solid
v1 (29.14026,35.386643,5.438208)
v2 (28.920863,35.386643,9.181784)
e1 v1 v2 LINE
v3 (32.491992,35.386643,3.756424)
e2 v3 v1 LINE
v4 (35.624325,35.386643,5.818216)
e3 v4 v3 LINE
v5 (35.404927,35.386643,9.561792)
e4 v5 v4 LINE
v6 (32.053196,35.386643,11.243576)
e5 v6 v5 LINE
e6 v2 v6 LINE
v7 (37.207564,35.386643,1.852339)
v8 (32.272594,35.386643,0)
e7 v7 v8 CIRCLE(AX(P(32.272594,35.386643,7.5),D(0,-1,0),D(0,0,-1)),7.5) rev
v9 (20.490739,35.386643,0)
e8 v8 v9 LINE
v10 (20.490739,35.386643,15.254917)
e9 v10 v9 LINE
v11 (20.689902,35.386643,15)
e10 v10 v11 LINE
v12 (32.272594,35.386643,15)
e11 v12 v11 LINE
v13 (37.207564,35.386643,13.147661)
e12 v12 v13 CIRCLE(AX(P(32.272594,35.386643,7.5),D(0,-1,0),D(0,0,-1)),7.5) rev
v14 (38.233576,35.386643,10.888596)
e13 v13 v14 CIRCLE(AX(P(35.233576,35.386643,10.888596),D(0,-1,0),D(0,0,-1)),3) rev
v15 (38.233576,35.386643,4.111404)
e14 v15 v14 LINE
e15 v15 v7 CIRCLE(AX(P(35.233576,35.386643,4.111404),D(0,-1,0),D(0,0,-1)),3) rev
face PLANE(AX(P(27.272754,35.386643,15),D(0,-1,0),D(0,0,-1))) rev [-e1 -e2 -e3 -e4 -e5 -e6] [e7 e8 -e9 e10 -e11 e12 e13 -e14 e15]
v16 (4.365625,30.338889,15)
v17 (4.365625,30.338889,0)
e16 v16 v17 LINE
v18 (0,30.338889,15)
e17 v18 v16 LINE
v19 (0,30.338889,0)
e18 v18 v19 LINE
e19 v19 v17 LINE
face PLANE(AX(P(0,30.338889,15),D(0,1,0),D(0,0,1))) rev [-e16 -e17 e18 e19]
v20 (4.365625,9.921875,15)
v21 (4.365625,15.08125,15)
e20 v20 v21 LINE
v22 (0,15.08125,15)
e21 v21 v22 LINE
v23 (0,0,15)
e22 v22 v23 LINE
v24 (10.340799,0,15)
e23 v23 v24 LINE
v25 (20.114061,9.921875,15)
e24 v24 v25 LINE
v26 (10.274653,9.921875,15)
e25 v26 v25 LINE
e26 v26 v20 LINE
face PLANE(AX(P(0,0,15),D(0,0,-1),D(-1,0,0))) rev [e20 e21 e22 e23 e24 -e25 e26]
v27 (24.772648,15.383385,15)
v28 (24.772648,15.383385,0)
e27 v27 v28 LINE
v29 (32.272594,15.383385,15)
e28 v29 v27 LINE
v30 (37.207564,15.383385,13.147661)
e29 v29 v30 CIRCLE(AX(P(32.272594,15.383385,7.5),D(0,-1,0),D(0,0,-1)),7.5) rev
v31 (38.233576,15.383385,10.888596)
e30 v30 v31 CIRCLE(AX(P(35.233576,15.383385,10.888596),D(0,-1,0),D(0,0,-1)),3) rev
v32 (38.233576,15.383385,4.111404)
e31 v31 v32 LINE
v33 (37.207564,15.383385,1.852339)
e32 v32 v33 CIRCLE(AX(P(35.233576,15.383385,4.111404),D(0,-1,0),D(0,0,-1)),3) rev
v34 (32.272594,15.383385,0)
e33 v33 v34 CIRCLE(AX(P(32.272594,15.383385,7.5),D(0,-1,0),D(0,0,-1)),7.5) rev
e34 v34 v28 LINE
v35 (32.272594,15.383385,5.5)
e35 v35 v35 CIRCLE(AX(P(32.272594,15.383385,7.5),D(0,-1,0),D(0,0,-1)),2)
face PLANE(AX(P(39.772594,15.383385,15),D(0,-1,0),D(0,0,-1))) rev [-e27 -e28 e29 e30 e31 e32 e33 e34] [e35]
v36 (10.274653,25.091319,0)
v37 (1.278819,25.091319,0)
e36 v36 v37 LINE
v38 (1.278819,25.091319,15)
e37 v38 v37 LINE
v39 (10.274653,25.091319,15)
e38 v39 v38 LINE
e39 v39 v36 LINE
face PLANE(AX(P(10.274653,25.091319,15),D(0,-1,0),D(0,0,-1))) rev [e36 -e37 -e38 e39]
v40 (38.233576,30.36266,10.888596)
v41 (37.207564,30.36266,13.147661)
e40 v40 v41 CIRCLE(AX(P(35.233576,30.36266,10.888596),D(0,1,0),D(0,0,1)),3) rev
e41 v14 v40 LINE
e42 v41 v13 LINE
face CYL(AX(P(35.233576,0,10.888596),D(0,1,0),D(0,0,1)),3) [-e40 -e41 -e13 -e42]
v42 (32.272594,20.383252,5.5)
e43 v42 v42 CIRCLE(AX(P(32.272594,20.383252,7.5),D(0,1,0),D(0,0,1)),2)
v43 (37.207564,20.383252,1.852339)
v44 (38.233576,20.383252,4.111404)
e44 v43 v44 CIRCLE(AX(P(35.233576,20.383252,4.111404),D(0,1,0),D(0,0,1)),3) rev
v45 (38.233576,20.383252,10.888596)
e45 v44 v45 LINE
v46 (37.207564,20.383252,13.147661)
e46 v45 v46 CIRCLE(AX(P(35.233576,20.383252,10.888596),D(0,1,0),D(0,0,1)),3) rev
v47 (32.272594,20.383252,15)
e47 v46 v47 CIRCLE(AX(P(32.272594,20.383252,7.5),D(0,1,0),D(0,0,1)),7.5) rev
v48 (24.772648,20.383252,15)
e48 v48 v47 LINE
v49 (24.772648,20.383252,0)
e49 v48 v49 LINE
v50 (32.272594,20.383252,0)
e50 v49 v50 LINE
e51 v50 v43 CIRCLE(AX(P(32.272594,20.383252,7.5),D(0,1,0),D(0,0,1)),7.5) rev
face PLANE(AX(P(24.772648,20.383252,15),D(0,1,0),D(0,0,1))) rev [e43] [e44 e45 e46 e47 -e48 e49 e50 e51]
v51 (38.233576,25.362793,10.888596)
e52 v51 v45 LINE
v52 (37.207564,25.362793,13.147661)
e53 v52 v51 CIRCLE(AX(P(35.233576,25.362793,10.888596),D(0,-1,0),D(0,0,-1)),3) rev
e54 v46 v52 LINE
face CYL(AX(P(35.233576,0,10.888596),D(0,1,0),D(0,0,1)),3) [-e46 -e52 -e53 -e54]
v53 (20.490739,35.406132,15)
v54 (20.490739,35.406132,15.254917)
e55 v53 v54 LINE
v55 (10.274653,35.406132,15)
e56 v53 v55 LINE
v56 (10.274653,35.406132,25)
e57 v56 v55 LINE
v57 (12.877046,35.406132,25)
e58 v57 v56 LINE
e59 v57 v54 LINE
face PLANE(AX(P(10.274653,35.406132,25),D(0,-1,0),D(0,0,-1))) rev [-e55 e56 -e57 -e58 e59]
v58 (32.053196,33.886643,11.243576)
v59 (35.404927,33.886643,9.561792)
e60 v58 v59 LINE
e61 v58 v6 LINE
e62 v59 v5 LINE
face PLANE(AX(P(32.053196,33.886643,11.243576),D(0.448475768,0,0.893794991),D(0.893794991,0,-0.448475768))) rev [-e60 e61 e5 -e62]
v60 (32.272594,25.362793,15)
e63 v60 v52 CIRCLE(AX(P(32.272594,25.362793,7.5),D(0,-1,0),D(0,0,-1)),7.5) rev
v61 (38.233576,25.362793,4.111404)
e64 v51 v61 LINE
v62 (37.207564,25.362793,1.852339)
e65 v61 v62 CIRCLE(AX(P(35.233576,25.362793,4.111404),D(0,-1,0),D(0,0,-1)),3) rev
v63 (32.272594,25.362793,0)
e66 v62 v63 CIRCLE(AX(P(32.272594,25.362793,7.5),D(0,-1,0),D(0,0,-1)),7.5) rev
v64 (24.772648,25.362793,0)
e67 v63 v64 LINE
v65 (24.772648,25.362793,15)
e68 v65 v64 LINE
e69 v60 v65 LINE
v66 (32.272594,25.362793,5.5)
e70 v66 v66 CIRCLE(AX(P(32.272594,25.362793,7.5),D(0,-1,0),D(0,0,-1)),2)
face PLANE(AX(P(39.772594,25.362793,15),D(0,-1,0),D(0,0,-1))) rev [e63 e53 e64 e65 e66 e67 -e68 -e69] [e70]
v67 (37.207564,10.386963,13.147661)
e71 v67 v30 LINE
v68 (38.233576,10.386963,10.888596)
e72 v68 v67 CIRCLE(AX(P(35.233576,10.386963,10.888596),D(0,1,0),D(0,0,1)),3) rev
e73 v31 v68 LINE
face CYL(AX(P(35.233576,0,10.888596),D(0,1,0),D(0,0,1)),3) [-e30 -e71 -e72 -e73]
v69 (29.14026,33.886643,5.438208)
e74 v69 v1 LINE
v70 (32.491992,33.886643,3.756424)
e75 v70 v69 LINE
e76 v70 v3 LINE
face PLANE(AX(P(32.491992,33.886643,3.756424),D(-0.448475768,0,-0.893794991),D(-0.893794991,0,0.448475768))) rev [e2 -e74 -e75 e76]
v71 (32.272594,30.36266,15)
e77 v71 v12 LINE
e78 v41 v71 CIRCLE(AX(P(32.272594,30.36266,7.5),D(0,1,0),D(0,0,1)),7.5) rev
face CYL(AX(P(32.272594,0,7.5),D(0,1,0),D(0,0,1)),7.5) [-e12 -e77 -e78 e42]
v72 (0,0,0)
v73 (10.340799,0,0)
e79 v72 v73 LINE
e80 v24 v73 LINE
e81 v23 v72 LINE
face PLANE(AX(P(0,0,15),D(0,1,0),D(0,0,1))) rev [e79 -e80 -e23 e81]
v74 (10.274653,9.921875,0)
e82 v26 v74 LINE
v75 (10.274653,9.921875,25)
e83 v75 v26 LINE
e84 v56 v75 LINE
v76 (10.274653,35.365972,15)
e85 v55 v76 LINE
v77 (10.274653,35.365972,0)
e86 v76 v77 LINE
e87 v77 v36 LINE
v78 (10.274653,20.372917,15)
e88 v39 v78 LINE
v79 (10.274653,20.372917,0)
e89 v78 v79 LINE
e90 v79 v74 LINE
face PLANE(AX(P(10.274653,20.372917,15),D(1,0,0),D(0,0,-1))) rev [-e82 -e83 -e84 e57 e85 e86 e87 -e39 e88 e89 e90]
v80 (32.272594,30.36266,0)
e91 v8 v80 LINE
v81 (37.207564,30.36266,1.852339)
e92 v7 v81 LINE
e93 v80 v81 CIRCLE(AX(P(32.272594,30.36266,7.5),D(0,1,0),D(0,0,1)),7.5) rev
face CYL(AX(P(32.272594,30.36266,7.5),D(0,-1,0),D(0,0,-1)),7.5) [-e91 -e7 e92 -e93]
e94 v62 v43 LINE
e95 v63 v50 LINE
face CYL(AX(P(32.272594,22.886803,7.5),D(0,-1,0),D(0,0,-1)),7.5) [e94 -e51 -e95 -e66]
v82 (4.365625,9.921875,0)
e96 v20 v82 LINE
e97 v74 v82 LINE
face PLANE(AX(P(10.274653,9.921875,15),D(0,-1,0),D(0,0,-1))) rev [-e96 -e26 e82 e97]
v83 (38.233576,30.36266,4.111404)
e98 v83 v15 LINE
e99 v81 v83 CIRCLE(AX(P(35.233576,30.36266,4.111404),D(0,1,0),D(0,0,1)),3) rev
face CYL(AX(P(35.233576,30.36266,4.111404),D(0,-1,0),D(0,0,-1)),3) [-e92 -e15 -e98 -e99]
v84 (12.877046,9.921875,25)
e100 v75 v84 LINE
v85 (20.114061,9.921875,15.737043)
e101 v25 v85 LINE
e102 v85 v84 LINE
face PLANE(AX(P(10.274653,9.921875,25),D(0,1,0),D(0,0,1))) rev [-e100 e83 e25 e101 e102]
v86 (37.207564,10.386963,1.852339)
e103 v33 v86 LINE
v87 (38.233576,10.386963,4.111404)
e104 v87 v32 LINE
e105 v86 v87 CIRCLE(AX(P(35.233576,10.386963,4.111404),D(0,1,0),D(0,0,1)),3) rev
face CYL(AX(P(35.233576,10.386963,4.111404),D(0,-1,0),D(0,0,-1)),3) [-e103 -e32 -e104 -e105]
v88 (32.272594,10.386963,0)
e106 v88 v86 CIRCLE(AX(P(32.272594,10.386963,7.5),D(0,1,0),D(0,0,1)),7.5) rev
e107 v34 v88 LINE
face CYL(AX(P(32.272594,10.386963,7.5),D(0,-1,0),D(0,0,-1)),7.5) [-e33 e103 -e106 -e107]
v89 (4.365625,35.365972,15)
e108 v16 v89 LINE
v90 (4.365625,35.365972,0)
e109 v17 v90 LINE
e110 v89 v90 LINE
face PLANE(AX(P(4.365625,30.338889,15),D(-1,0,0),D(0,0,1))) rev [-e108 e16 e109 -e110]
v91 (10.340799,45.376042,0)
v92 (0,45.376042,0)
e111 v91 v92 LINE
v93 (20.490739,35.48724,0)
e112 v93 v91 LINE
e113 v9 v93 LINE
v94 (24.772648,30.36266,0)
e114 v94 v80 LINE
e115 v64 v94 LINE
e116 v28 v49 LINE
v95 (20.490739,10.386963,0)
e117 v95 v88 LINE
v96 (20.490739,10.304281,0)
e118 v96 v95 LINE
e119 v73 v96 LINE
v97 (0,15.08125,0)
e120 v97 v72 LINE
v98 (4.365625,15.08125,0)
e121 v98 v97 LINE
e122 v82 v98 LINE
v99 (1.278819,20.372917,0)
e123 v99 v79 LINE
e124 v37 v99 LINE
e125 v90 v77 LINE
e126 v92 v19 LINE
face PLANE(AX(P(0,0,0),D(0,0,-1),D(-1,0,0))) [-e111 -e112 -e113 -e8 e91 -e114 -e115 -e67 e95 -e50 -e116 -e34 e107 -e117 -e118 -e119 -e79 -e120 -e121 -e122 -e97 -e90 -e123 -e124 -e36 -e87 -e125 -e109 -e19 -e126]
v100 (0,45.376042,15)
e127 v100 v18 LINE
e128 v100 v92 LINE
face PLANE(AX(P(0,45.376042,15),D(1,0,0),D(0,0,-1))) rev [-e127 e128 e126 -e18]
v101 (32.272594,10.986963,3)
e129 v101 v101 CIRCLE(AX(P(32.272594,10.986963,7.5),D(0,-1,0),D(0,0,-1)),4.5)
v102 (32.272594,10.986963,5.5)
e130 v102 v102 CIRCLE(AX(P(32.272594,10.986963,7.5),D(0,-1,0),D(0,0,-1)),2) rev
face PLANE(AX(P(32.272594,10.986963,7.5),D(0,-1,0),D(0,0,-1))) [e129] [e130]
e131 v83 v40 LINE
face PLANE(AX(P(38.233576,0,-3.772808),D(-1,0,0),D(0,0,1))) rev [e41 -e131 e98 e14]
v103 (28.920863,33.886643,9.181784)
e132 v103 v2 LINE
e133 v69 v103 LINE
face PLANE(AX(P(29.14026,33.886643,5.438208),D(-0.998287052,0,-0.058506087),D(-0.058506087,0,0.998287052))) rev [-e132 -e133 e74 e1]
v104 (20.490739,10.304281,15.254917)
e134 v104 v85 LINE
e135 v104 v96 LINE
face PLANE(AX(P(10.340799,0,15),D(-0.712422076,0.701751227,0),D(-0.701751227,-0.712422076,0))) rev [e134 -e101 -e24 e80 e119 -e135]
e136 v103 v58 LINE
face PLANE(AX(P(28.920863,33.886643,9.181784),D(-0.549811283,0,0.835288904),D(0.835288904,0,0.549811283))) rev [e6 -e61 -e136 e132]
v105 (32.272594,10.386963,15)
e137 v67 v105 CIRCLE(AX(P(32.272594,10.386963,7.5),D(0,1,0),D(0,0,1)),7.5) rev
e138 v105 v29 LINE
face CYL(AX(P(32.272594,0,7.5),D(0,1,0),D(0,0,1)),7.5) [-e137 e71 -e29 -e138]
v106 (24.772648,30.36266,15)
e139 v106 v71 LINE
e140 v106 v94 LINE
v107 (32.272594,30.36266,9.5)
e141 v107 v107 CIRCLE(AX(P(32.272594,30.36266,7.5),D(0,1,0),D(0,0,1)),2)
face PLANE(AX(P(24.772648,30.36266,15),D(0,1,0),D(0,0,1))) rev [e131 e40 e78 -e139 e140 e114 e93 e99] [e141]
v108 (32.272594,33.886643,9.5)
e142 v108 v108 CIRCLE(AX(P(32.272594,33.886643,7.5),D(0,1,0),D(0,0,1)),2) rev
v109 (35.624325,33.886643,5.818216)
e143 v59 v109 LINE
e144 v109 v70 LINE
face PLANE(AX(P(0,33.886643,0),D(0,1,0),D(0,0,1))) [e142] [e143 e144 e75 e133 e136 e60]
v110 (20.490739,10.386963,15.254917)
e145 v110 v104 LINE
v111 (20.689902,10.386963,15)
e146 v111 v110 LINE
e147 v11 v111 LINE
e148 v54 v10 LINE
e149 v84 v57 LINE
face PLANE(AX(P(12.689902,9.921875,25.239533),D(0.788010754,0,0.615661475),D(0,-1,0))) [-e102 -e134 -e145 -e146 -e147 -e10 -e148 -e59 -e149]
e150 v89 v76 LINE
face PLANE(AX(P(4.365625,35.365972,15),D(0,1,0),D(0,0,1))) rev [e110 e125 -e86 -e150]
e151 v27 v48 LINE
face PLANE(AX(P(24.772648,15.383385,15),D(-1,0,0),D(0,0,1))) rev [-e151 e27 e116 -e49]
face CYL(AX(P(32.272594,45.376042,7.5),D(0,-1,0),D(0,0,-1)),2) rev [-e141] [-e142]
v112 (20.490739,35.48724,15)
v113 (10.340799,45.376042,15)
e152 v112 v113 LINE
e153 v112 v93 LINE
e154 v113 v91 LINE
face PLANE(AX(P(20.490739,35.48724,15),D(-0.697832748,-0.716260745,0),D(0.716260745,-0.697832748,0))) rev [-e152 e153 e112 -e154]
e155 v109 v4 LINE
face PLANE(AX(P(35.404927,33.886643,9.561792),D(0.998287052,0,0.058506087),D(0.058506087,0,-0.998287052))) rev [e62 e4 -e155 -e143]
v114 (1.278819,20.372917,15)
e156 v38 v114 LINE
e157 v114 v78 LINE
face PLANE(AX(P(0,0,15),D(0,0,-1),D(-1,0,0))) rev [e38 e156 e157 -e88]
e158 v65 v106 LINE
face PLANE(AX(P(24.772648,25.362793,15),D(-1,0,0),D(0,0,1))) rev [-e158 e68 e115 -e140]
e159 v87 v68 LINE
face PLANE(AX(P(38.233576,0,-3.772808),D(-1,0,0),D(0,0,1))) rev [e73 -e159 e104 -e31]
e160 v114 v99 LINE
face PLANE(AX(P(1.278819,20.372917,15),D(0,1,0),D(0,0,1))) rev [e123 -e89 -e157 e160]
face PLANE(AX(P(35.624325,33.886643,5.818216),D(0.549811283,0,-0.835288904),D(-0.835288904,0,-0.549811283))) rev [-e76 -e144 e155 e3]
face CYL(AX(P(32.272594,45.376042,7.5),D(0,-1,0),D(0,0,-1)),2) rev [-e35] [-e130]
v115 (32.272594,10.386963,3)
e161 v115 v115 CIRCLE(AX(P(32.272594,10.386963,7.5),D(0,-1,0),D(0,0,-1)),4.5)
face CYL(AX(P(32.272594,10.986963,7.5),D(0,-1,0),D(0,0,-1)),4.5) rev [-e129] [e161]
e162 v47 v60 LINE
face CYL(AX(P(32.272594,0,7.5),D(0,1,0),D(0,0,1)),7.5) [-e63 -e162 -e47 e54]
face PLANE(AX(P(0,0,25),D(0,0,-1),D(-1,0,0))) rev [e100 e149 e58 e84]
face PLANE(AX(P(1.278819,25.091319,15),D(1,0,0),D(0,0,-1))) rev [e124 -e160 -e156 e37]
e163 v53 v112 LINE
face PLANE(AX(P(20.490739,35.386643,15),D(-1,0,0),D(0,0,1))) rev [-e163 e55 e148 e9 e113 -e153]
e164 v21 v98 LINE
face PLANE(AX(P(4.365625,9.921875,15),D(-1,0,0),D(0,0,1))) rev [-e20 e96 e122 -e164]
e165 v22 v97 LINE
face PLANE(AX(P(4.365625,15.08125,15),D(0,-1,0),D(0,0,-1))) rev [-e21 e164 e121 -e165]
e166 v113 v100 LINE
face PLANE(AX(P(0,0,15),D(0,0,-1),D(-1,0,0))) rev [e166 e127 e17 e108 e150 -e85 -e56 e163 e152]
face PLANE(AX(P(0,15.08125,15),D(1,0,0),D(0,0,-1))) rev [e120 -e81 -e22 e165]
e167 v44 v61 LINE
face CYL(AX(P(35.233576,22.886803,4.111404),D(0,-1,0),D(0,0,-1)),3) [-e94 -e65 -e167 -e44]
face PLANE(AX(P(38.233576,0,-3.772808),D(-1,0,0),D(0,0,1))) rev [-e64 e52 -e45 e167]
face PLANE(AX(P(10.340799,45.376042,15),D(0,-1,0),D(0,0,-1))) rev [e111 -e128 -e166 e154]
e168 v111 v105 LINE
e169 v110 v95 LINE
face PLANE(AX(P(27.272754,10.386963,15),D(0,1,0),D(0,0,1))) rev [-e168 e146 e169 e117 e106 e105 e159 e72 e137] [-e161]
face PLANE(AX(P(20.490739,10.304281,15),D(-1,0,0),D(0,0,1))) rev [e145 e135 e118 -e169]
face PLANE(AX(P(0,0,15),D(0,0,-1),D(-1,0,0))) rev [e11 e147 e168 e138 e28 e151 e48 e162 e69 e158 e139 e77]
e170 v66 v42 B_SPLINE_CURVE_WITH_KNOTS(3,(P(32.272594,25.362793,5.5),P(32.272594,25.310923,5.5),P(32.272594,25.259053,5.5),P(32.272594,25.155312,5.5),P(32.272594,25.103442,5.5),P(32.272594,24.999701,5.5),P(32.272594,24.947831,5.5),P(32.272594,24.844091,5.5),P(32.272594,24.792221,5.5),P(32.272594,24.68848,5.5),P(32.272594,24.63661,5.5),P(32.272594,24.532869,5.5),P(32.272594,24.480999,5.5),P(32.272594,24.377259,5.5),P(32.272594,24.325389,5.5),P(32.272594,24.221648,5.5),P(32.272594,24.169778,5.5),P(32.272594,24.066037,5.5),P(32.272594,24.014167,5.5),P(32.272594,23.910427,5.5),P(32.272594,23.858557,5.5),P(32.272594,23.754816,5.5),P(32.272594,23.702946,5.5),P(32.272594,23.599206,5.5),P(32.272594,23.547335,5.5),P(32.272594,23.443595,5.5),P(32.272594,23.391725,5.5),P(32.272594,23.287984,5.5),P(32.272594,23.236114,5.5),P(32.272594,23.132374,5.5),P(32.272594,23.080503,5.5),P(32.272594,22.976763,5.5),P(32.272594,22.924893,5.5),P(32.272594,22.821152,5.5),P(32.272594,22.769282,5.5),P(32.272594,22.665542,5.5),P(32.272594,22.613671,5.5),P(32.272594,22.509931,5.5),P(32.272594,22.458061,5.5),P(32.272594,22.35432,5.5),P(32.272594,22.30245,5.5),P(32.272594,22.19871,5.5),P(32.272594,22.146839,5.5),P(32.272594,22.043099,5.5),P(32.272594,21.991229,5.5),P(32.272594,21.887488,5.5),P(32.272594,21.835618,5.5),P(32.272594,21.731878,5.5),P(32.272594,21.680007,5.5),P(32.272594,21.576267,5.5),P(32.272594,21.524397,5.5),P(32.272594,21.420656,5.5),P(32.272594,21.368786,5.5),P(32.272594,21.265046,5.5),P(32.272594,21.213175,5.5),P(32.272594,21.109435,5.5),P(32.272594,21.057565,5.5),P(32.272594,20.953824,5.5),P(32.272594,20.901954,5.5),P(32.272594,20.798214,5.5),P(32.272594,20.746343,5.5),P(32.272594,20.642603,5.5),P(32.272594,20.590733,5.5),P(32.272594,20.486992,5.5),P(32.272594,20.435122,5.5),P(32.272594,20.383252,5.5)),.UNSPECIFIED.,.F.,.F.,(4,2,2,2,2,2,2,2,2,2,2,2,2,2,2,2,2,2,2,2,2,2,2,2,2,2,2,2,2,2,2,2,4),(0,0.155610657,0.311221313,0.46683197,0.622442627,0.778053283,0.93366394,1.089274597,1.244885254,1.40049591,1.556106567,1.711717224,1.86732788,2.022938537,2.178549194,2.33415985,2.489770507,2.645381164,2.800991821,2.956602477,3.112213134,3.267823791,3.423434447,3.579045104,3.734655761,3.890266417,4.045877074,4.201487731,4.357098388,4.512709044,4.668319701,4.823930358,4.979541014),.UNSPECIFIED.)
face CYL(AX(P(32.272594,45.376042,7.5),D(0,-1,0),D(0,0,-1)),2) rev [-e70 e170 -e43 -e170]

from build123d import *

# Parameters (mm, degrees)
BOSS_EXTRUDE1_DEPTH = 15
FILLET1_R           = 7.5
SKETCH2_R           = 2
CUT_EXTRUDE1_DEPTH  = 56.055379886
SKETCH3_R           = 4.5
CUT_EXTRUDE2_DEPTH  = 0.6
CUT_EXTRUDE3_DEPTH  = 1.5
SKETCH5_W           = 11.340962939
SKETCH5_H           = 24.83561836
CUT_EXTRUDE4_DEPTH  = 56.308893581
FILLET2_R           = 3
SKETCH6_W           = 2.415249458
SKETCH6_H           = 25.484257417
BOSS_EXTRUDE2_DEPTH = 10
CHAMFER1_SIZE       = 8
CHAMFER1_SIZE_2     = 10.239533058


# Some blends are built 0.0001 mm under size
with BuildPart() as part:
    # Sketch1 → Boss-Extrude1 (new body)
    with BuildSketch(Plane.XY):
        Polygon((27.272753899, 35.386642786), (20.490738927, 35.386642786), (20.490738927, 35.487239574), (10.340798609, 45.376041655), (0, 45.376041655), (0, 30.338888881), (4.365624999, 30.338888881), (4.365624999, 35.365972213), (10.274652775, 35.365972213), (10.274652775, 25.091319438), (1.278819444, 25.091319438), (1.278819444, 20.372916662), (10.274652775, 20.372916662), (10.274652775, 9.921874998), (4.365624999, 9.921874998), (4.365624999, 15.081249996), (0, 15.081249996), (0, 0), (10.340798609, 0), (20.490738927, 10.304280596), (20.490738927, 10.386962888), (27.272753899, 10.386962888), (39.772593849, 10.386962888), (39.772593849, 15.38338487), (24.772648106, 15.38338487), (24.772648106, 20.383251948), (39.772593849, 20.383251948), (39.772593849, 22.886802837), (39.772593849, 25.362792962), (24.772648106, 25.362792962), (24.772648106, 30.36266004), (39.772593849, 30.36266004), (39.772593849, 35.386642786), align=None)
    extrude(amount=BOSS_EXTRUDE1_DEPTH)

    # Fillet1
    fillet1_edges = [part.edges().sort_by_distance(p)[0] for p in [
        (39.772593849, 32.874651413, 0),
        (39.772593849, 22.873022455, 0),
        (39.772593849, 12.885173879, 0),
        (39.772593849, 32.874651413, 15),
        (39.772593849, 22.873022455, 15),
        (39.772593849, 12.885173879, 15),
    ]]
    fillet(fillet1_edges, radius=FILLET1_R - 0.0001)  # a hair under: the kernel refuses the full size

    # Sketch2 → Cut-Extrude1 (cut, through all)
    with BuildSketch(Plane.XZ.offset(-10.386962888)):
        with Locations(Location((32.272593849, 7.5, 0), (0, 0, 270))):
            Circle(SKETCH2_R)
    extrude(amount=-CUT_EXTRUDE1_DEPTH, mode=Mode.SUBTRACT)

    # Sketch3 → Cut-Extrude2 (cut)
    with BuildSketch(Plane(origin=(0, 10.386962888, 0), x_dir=(-1, 0, 0), z_dir=(0, -1, 0))):
        with Locations(Location((-32.272593849, -7.5, 0), (0, 0, 90))):
            Circle(SKETCH3_R)
    extrude(amount=-CUT_EXTRUDE2_DEPTH, mode=Mode.SUBTRACT)

    # Sketch4 → Cut-Extrude3 (cut)
    with BuildSketch(Plane(origin=(0, 35.386642786, 0), x_dir=(1, 0, 0), z_dir=(0, 1, 0))):
        Polygon((35.624325063, -5.818215869), (32.491991675, -3.756423556), (29.14026046, -5.438207687), (28.920862634, -9.181784131), (32.053196023, -11.243576444), (35.404927237, -9.561792313), align=None)
    extrude(amount=-CUT_EXTRUDE3_DEPTH, mode=Mode.SUBTRACT)

    # Sketch5 → Cut-Extrude4 (cut, through all)
    with BuildSketch(Plane(origin=(0, 35.386642786, 0), x_dir=(1, 0, 0), z_dir=(0, 1, 0))):
        with Locations((43.904057381, -8.645001066)):
            Rectangle(SKETCH5_W, SKETCH5_H)
    extrude(amount=-CUT_EXTRUDE4_DEPTH, mode=Mode.SUBTRACT)

    # Fillet2
    fillet2_edges = [part.edges().sort_by_distance(p)[0] for p in [
        (38.233575911, 12.885173879, 2.948374426),
        (38.233575911, 12.885173879, 12.051625574),
        (38.233575911, 22.873022455, 12.051625574),
        (38.233575911, 22.873022455, 2.948374426),
        (38.233575911, 32.874651413, 12.051625574),
        (38.233575911, 32.874651413, 2.948374426),
    ]]
    fillet(fillet2_edges, radius=FILLET2_R)

    # Sketch6 → Boss-Extrude2 (add)
    with BuildSketch(Plane.XY.offset(15)):
        with Locations((11.482277504, 22.664003707)):
            Rectangle(SKETCH6_W, SKETCH6_H)
    extrude(amount=BOSS_EXTRUDE2_DEPTH)

    # Chamfer1
    # the kernel refuses this chamfer: 10.239533058, 8 mm, written as the material it adds along each edge
    with BuildSketch(Plane(origin=(12.689902233, 9.921874998, 15), x_dir=(0.9992360216896828, 0, -0.03908161918057676), z_dir=(0, 1, 0))) as chamfer1_piece_1_section:
        Polygon((CHAMFER1_SIZE * 0.99923602169, -CHAMFER1_SIZE * 0.0390816191806), (-CHAMFER1_SIZE_2 * 0.0390816191788, -CHAMFER1_SIZE_2 * 0.999236021645), (0, 0), align=None)
    chamfer1_piece_1 = extrude(amount=25.484257417, mode=Mode.PRIVATE)
    chamfer1_piece_1 = split(chamfer1_piece_1, bisect_by=Plane(origin=(20.793346788, 10.386962888, 14.678631533), z_dir=(0, 1, 0)), keep=Keep.TOP, mode=Mode.PRIVATE)
    chamfer1_piece_1 = split(chamfer1_piece_1, bisect_by=Plane(origin=(20.737221422, 10.554511111, 14.678631533), z_dir=(0.7124220763083485, -0.7017512274221556, 0)), keep=Keep.TOP, mode=Mode.PRIVATE)
    add(chamfer1_piece_1)
    with BuildSketch(Plane(origin=(12.689902233, 9.921874998, 15), x_dir=(0.9992360216896828, 0, -0.03908161918057676), z_dir=(0, 1, 0))) as chamfer1_piece_2_section:
        Polygon((CHAMFER1_SIZE * 0.99923602169, -CHAMFER1_SIZE * 0.0390816191806), (-CHAMFER1_SIZE_2 * 0.0390816191788, -CHAMFER1_SIZE_2 * 0.999236021645), (0, 0), align=None)
    chamfer1_piece_2 = extrude(amount=25.484257417, mode=Mode.PRIVATE)
    chamfer1_piece_2 = split(chamfer1_piece_2, bisect_by=Plane(origin=(15.274873459, 10.386962888, 18.392715242), z_dir=(0, -1, 0)), keep=Keep.TOP, mode=Mode.PRIVATE)
    chamfer1_piece_2 = split(chamfer1_piece_2, bisect_by=Plane(origin=(20.490738927, 10.154752313, 18.392715242), z_dir=(-1, 0, 0)), keep=Keep.TOP, mode=Mode.PRIVATE)
    chamfer1_piece_2 = split(chamfer1_piece_2, bisect_by=Plane(origin=(17.84740539, 7.620752455, 18.392715242), z_dir=(-0.7124220763083485, 0.7017512274221556, 0)), keep=Keep.TOP, mode=Mode.PRIVATE)
    chamfer1_piece_2 = split(chamfer1_piece_2, bisect_by=Plane(origin=(15.274873459, 10.154752313, 25), z_dir=(0, 0, -1)), keep=Keep.TOP, mode=Mode.PRIVATE)
    add(chamfer1_piece_2)
    with BuildSketch(Plane(origin=(12.689902233, 9.921874998, 15), x_dir=(0.9992360216896828, 0, -0.03908161918057676), z_dir=(0, 1, 0))) as chamfer1_piece_3_section:
        Polygon((CHAMFER1_SIZE * 0.99923602169, -CHAMFER1_SIZE * 0.0390816191806), (-CHAMFER1_SIZE_2 * 0.0390816191788, -CHAMFER1_SIZE_2 * 0.999236021645), (0, 0), align=None)
    chamfer1_piece_3 = extrude(amount=25.484257417, mode=Mode.PRIVATE)
    chamfer1_piece_3 = split(chamfer1_piece_3, bisect_by=Plane(origin=(20.673018583, 35.386642786, 14.762443719), z_dir=(0, -1, 0)), keep=Keep.TOP, mode=Mode.PRIVATE)
    chamfer1_piece_3 = split(chamfer1_piece_3, bisect_by=Plane(origin=(20.673018583, 10.386962888, 14.762443719), z_dir=(0, 1, 0)), keep=Keep.TOP, mode=Mode.PRIVATE)
    chamfer1_piece_3 = split(chamfer1_piece_3, bisect_by=Plane(origin=(20.490738927, 22.896544527, 14.762443719), z_dir=(1, 0, 0)), keep=Keep.TOP, mode=Mode.PRIVATE)
    chamfer1_piece_3 = split(chamfer1_piece_3, bisect_by=Plane(origin=(26.875918459, 16.786553348, 14.762443719), z_dir=(-0.7124220763083485, 0.7017512274221556, 0)), keep=Keep.TOP, mode=Mode.PRIVATE)
    chamfer1_piece_3 = split(chamfer1_piece_3, bisect_by=Plane(origin=(26.87746344, 29.264833071, 14.762443719), z_dir=(-0.6978327483962767, -0.7162607453055758, 0)), keep=Keep.TOP, mode=Mode.PRIVATE)
    add(chamfer1_piece_3)
    with BuildSketch(Plane(origin=(12.689902233, 9.921874998, 15), x_dir=(0.9992360216896828, 0, -0.03908161918057676), z_dir=(0, 1, 0))) as chamfer1_piece_4_section:
        Polygon((CHAMFER1_SIZE * 0.99923602169, -CHAMFER1_SIZE * 0.0390816191806), (-CHAMFER1_SIZE_2 * 0.0390816191788, -CHAMFER1_SIZE_2 * 0.999236021645), (0, 0), align=None)
    chamfer1_piece_4 = extrude(amount=25.484257417, mode=Mode.PRIVATE)
    chamfer1_piece_4 = split(chamfer1_piece_4, bisect_by=Plane(origin=(15.290163511, 35.386642786, 18.382453995), z_dir=(0, -1, 0)), keep=Keep.TOP, mode=Mode.PRIVATE)
    chamfer1_piece_4 = split(chamfer1_piece_4, bisect_by=Plane(origin=(15.290163511, 10.386962888, 18.382453995), z_dir=(0, 1, 0)), keep=Keep.TOP, mode=Mode.PRIVATE)
    chamfer1_piece_4 = split(chamfer1_piece_4, bisect_by=Plane(origin=(20.490738927, 22.886802837, 18.382453995), z_dir=(-1, 0, 0)), keep=Keep.TOP, mode=Mode.PRIVATE)
    chamfer1_piece_4 = split(chamfer1_piece_4, bisect_by=Plane(origin=(15.290163511, 22.886802837, 25), z_dir=(0, 0, -1)), keep=Keep.TOP, mode=Mode.PRIVATE)
    add(chamfer1_piece_4)
    with BuildSketch(Plane(origin=(12.689902233, 9.921874998, 15), x_dir=(0.9992360216896828, 0, -0.03908161918057676), z_dir=(0, 1, 0))) as chamfer1_piece_5_section:
        Polygon((CHAMFER1_SIZE * 0.99923602169, -CHAMFER1_SIZE * 0.0390816191806), (-CHAMFER1_SIZE_2 * 0.0390816191788, -CHAMFER1_SIZE_2 * 0.999236021645), (0, 0), align=None)
    chamfer1_piece_5 = extrude(amount=25.484257417, mode=Mode.PRIVATE)
    chamfer1_piece_5 = split(chamfer1_piece_5, bisect_by=Plane(origin=(20.802968311, 35.386642786, 14.671925701), z_dir=(0, -1, 0)), keep=Keep.TOP, mode=Mode.PRIVATE)
    chamfer1_piece_5 = split(chamfer1_piece_5, bisect_by=Plane(origin=(20.752085711, 35.232616736, 14.671925701), z_dir=(0.6978327483962767, 0.7162607453055758, 0)), keep=Keep.TOP, mode=Mode.PRIVATE)
    add(chamfer1_piece_5)
    with BuildSketch(Plane(origin=(12.689902233, 9.921874998, 15), x_dir=(0.9992360216896828, 0, -0.03908161918057676), z_dir=(0, 1, 0))) as chamfer1_piece_6_section:
        Polygon((CHAMFER1_SIZE * 0.99923602169, -CHAMFER1_SIZE * 0.0390816191806), (-CHAMFER1_SIZE_2 * 0.0390816191788, -CHAMFER1_SIZE_2 * 0.999236021645), (0, 0), align=None)
    chamfer1_piece_6 = extrude(amount=25.484257417, mode=Mode.PRIVATE)
    chamfer1_piece_6 = split(chamfer1_piece_6, bisect_by=Plane(origin=(15.290163511, 35.386642786, 18.382453995), z_dir=(0, 1, 0)), keep=Keep.TOP, mode=Mode.PRIVATE)
    chamfer1_piece_6 = split(chamfer1_piece_6, bisect_by=Plane(origin=(20.490738927, 35.396387601, 18.382453995), z_dir=(-1, 0, 0)), keep=Keep.TOP, mode=Mode.PRIVATE)
    chamfer1_piece_6 = split(chamfer1_piece_6, bisect_by=Plane(origin=(15.290163511, 35.396387601, 25), z_dir=(0, 0, -1)), keep=Keep.TOP, mode=Mode.PRIVATE)
    add(chamfer1_piece_6)


solid = part.part
